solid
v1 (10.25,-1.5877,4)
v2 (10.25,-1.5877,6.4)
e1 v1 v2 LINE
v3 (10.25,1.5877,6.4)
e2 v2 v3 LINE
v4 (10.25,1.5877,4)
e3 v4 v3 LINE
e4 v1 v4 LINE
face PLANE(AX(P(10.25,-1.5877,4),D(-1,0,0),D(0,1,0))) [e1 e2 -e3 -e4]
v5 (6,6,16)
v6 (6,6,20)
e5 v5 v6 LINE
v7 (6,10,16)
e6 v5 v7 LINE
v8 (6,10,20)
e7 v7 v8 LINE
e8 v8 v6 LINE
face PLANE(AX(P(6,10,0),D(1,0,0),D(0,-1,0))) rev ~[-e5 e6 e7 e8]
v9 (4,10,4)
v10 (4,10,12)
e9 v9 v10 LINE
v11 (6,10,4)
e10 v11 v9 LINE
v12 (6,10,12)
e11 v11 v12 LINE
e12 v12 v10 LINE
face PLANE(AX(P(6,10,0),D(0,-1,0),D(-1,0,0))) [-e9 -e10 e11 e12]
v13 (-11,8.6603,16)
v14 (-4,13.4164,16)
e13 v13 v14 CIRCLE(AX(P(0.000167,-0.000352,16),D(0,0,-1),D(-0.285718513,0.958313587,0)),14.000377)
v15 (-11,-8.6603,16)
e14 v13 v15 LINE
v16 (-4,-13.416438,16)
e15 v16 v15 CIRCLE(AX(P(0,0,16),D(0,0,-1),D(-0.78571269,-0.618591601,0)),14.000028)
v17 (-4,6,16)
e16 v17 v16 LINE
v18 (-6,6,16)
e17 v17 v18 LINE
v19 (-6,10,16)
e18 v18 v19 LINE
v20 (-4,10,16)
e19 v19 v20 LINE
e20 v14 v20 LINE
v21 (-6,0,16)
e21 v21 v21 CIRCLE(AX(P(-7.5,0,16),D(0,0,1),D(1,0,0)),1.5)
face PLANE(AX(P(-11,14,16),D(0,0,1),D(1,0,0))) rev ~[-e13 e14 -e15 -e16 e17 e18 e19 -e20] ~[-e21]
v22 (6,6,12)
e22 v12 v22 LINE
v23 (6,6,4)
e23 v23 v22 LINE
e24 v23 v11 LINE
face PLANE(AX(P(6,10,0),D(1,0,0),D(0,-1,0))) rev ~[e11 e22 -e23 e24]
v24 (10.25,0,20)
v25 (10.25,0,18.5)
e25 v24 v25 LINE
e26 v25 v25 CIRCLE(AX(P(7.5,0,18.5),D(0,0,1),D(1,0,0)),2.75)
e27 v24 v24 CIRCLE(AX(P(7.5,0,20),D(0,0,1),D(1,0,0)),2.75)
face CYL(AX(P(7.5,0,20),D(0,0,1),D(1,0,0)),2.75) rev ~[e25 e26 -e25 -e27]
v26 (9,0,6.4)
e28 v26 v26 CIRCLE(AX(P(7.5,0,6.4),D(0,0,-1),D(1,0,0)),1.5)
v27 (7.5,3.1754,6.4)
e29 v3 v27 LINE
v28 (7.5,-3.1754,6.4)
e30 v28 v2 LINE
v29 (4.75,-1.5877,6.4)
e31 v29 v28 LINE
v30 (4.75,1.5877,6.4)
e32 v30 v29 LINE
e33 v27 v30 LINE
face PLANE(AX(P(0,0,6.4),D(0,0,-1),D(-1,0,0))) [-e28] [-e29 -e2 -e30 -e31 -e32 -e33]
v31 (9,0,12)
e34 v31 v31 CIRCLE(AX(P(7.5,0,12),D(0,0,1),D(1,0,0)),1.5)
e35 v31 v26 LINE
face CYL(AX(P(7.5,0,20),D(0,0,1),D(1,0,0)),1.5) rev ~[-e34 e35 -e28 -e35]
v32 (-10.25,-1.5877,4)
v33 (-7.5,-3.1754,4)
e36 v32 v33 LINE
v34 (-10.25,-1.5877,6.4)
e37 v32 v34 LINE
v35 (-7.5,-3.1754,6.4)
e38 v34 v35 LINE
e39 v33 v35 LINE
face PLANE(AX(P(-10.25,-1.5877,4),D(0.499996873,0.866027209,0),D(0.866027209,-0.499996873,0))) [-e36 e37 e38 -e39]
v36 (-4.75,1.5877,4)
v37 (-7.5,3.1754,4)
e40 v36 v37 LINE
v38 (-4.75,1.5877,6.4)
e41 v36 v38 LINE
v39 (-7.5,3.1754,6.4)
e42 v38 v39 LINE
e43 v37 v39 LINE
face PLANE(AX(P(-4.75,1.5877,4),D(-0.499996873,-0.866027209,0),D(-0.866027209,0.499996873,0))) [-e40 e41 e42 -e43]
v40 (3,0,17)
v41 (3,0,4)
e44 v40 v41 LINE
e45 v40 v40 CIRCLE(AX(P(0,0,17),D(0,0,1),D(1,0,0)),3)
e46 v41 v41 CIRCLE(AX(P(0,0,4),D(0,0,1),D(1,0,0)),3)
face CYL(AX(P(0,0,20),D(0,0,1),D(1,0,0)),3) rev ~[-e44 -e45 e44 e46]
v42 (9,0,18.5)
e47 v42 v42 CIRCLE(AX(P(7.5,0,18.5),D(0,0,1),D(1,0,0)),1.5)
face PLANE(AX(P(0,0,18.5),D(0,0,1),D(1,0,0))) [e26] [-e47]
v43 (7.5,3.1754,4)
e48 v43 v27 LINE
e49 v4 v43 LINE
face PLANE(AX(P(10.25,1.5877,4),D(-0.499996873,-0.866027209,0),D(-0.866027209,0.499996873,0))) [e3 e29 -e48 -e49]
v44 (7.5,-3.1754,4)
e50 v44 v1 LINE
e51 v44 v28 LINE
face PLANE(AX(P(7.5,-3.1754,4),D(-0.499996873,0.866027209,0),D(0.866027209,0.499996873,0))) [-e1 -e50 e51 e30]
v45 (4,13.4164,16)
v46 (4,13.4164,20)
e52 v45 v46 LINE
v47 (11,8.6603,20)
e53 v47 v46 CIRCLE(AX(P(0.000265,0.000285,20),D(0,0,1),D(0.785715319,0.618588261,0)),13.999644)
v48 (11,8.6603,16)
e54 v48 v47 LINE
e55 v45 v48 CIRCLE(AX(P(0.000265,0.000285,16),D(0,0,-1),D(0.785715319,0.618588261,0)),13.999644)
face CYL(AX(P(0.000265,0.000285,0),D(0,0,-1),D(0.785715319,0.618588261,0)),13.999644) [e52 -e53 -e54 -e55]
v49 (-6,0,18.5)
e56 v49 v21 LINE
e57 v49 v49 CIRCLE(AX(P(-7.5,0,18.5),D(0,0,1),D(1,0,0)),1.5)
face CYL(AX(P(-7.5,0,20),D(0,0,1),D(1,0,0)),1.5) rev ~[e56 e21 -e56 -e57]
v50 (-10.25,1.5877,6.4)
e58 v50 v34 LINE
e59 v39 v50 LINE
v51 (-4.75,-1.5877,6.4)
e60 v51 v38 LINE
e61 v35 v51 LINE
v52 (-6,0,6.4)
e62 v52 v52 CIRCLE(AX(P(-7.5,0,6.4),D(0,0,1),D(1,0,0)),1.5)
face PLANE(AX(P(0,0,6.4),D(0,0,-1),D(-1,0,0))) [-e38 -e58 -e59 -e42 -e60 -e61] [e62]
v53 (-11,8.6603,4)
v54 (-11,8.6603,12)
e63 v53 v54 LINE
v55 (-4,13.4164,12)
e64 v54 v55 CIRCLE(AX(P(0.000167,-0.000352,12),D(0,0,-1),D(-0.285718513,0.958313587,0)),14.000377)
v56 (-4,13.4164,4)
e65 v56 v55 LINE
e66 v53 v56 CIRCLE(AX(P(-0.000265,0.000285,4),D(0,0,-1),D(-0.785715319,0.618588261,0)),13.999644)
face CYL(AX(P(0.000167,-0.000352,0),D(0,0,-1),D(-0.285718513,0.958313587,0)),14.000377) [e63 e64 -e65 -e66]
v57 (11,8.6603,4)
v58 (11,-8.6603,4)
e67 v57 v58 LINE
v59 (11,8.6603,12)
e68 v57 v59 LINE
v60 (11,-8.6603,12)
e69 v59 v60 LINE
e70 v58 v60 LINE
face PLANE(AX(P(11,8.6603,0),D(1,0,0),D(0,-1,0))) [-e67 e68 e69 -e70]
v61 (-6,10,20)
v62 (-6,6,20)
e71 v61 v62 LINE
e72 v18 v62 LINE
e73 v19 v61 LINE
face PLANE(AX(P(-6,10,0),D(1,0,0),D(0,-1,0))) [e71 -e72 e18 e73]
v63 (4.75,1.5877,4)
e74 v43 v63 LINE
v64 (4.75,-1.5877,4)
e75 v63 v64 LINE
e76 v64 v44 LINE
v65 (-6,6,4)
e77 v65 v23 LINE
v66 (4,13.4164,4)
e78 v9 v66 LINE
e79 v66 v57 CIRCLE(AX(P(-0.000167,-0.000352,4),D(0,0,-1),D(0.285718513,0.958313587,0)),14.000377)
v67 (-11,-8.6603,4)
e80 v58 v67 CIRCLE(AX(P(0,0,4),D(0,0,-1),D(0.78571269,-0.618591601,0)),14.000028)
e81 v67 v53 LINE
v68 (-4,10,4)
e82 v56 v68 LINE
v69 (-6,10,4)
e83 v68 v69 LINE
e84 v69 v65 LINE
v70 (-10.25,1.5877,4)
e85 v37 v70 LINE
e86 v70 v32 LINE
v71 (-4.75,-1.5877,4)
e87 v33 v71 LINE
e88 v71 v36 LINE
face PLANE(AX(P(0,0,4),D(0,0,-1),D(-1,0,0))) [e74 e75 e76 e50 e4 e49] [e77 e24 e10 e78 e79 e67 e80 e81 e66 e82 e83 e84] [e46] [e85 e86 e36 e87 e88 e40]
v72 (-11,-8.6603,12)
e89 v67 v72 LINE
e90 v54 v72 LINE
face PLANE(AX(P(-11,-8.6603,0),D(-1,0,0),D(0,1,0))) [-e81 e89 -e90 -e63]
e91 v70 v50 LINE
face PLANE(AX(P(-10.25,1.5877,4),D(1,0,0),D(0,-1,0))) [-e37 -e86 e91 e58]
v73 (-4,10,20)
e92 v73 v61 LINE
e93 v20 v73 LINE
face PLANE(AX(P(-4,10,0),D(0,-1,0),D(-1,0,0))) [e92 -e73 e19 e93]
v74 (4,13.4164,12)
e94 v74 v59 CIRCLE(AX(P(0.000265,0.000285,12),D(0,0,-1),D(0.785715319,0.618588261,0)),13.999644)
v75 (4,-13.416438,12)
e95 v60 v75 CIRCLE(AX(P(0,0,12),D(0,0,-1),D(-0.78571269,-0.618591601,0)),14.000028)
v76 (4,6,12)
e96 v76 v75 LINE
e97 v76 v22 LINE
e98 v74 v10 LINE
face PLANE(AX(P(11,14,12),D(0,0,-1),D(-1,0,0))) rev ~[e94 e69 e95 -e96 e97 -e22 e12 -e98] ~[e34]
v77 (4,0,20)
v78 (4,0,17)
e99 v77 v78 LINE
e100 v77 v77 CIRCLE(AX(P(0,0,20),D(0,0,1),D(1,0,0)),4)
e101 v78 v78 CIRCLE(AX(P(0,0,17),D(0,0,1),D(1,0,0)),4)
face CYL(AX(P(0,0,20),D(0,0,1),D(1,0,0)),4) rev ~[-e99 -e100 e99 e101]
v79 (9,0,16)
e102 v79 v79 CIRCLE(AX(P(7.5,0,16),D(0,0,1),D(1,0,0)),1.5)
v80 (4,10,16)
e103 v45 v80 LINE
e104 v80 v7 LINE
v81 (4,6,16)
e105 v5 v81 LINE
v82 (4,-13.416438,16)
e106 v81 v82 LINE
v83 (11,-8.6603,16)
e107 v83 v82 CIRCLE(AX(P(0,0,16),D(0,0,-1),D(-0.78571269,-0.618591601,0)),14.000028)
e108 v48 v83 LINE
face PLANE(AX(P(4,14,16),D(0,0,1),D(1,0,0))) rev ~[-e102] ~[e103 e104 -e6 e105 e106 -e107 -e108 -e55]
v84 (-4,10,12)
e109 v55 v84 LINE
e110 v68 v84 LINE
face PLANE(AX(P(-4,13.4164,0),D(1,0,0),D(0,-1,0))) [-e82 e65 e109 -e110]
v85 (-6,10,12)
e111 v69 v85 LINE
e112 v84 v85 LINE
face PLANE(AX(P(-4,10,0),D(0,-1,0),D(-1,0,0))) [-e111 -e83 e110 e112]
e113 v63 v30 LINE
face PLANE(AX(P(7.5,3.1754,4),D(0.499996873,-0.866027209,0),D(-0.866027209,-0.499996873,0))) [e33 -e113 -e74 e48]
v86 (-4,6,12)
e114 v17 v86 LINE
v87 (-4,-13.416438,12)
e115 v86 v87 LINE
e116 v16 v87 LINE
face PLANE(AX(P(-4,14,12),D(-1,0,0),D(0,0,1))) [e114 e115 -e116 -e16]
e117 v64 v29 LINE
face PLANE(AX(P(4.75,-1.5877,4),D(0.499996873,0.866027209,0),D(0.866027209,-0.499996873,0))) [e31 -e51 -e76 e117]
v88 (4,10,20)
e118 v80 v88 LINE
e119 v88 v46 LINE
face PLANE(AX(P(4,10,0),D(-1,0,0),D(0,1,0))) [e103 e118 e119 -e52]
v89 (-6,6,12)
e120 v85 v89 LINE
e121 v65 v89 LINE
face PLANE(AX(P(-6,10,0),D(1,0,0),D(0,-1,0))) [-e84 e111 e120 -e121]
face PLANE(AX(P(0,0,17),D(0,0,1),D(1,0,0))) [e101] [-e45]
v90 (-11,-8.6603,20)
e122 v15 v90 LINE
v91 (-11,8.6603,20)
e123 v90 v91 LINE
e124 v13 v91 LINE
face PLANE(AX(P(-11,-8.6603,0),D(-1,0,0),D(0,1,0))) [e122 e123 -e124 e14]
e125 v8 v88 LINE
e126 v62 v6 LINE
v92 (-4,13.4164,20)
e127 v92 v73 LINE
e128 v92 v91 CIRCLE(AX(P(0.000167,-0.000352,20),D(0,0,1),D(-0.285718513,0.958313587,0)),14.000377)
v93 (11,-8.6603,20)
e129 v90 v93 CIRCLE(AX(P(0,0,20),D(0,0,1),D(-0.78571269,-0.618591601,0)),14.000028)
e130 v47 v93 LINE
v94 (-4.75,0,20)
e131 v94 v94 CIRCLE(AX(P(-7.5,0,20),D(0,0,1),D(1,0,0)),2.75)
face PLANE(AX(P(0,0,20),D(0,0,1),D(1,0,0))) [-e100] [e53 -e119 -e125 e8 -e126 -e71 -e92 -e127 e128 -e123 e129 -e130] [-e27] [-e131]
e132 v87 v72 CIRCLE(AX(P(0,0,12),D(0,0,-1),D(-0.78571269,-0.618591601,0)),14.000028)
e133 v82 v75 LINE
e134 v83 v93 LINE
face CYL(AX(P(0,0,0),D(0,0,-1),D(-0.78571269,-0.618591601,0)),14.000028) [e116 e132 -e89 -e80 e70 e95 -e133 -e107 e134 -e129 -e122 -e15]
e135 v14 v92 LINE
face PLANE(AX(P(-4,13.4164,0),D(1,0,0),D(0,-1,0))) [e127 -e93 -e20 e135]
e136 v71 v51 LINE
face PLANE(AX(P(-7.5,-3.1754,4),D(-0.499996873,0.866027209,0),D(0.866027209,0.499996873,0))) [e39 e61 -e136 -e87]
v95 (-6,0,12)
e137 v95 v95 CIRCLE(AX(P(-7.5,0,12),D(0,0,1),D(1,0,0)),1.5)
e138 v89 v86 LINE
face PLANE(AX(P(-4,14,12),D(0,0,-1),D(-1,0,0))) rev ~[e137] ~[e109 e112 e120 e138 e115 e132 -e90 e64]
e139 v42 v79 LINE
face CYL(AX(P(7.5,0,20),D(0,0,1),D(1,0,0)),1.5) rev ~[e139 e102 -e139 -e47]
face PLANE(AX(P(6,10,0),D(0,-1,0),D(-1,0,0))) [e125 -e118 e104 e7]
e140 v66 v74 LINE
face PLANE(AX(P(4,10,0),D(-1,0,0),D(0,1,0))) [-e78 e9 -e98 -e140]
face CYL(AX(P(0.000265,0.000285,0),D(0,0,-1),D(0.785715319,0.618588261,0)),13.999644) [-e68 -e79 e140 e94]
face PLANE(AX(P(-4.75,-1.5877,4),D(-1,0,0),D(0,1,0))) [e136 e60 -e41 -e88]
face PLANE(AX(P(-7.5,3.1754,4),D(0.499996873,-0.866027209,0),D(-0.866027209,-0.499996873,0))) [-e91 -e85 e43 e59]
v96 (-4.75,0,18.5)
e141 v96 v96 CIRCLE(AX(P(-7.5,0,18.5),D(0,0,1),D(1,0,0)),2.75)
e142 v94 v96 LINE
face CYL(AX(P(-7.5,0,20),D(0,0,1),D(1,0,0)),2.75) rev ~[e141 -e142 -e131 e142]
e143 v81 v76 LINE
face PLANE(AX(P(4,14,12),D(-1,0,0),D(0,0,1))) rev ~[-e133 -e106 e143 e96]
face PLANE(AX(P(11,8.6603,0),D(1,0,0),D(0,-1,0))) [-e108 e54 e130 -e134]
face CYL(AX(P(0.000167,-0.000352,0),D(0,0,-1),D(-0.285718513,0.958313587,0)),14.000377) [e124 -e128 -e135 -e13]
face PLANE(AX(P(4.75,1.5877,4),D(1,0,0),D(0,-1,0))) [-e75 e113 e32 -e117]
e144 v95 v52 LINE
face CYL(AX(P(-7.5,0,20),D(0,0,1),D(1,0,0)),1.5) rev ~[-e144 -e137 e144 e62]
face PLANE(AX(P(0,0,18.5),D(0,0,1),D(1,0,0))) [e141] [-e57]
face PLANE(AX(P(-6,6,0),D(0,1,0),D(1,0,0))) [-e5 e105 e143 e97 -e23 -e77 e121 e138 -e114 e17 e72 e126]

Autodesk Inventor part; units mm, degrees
ref_plane "YZ Plane" through (0, 0, 0) normal (1, 0, 0) x (0, 1, 0)
ref_plane "XZ Plane" through (0, 0, 0) normal (0, 1, 0) x (-1, 0, 0)
sketch "Náčrt1" plane through (0, 0, 0) normal (0, 0, 1) x (1, 0, 0)
  line L0 (11, 8.6603) -> (11, -8.6603)
  line L1 (-11, -8.6603) -> (-11, 8.6603)
  arc A0 (-11, -8.6603) -> (11, -8.6603) centre (0, 0) ccw
  line L2 (-4, 13.4164) -> (-4, 10)
  line L3 (-4, 10) -> (-6, 10)
  line L4 (-6, 6) -> (6, 6)
  line L5 (6, 10) -> (4, 10)
  line L6 (4, 10) -> (4, 13.4164)
  line L7 (-6, 10) -> (-6, 6)
  line L8 (6, 10) -> (6, 6)
  arc A1 (11, 8.6603) -> (4, 13.4164) centre (0, 0) ccw
  arc A2 (-4, 13.4164) -> (-11, 8.6603) centre (0, 0) ccw
  dimension "d26" = 22
  dimension "attachmentRadius" = 14
  dimension "d28" = 14
  dimension "d29" = 14
extrude "Vysunutí1" add sketch "Náčrt1" along normal blind 20
ref_plane "Pracovní rovina1" through (0, 14, 0) normal (0, 1, 0) x (-1, 0, 0)
sketch "Náčrt2" plane through (0, 14, 0) normal (0, 1, 0) x (-1, 0, 0)
  line L0 (11, 0) -> (11, 20) projected
  line L1 (4, 0) -> (4, 20) projected
  line L2 (11, 16) -> (4, 16)
  line L3 (4, 16) -> (4, 12)
  line L4 (4, 12) -> (11, 12)
  line L5 (11, 12) -> (11, 16)
  line L6 (-4, 0) -> (-4, 20) projected
  line L7 (-11, 0) -> (-11, 20) projected
  line L8 (-4, 16) -> (-11, 16)
  line L9 (-11, 16) -> (-11, 12)
  line L10 (-11, 12) -> (-4, 12)
  line L11 (-4, 12) -> (-4, 16)
  point P0 (0, 0)
extrude "Vysunutí2" cut sketch "Náčrt2" against normal up to next
sketch "Náčrt6" plane through (0, 0, 20) normal (0, 0, 1) x (1, 0, 0)
  circle A0 centre (7.5, 0) radius 1.5
  circle A1 centre (-7.5, 0) radius 1.5
  line L0 (11, -8.6603) -> (11, 8.6603) projected
  line L1 (-11, 8.6603) -> (-11, -8.6603) projected
  arc A2 (11, 8.6603) -> (4, 13.4164) centre (0, 0) ccw projected
  dimension "d15" = 3.5
  dimension "attachmentHoleOffset" = 3.5
  dimension "d17" = 3
  dimension "attachmentHoleDia" = 3
extrude "Vysunutí6" cut sketch "Náčrt6" against normal up to surface (20 mm away)
sketch "Náčrt8" plane through (0, 0, 0) normal (0, 0, -1) x (-1, 0, 0)
  circle A0 centre (-7.5, 0) radius 1.5 projected
  circle A1 centre (7.5, 0) radius 1.5 projected
  line L0 (-11, 8.6603) -> (-11, -8.6603) projected
  arc A2 (-11, -8.6603) -> (11, -8.6603) centre (0, 0) ccw projected
  line L1 (11, -8.6603) -> (11, 8.6603) projected
  arc A3 (11, 8.6603) -> (4, 13.4164) centre (0, 0) ccw projected
  line L2 (4, 13.4164) -> (4, 10) projected
  line L3 (4, 10) -> (6, 10) projected
  line L4 (6, 10) -> (6, 6) projected
  line L5 (6, 6) -> (-6, 6) projected
  line L6 (-6, 6) -> (-6, 10) projected
  line L7 (-6, 10) -> (-4, 10) projected
  line L8 (-4, 10) -> (-4, 13.4164) projected
  arc A4 (-4, 13.4164) -> (-11, 8.6603) centre (0, 0) ccw projected
extrude "Vysunutí8" cut sketch "Náčrt8" against normal blind 4
sketch "Náčrt9" plane through (0, 0, 20) normal (0, 0, 1) x (1, 0, 0)
  arc A0 (-4, 13.4164) -> (-11, 8.6603) centre (0, 0) ccw projected
  circle A1 centre (0, 0) radius 3
extrude "Vysunutí9" cut sketch "Náčrt9" against normal up to next
sketch "Náčrt10" plane through (0, 0, 20) normal (0, 0, 1) x (1, 0, 0)
  circle A0 centre (0, 0) radius 3 projected
  arc A1 (-11, -8.6603) -> (11, -8.6603) centre (0, 0) ccw projected
  circle A2 centre (0, 0) radius 4
  dimension "d23" = 8
extrude "Vysunutí10" cut sketch "Náčrt10" against normal blind 3
sketch "Náčrt11" plane through (0, 0, 20) normal (0, 0, 1) x (1, 0, 0)
  circle A0 centre (7.5, 0) radius 1.5 projected
  circle A1 centre (-7.5, 0) radius 1.5 projected
  circle A2 centre (-7.5, 0) radius 1.5 projected
  circle A3 centre (-7.5, 0) radius 2.75
  circle A4 centre (7.5, 0) radius 1.5 projected
  circle A5 centre (7.5, 0) radius 2.75
  dimension "d30" = 5.5
  dimension "d31" = 5.5
extrude "Vysunutí11" cut sketch "Náčrt11" against normal blind 1.5
sketch "Náčrt12" plane through (0, 0, 4) normal (0, 0, -1) x (-1, 0, 0)
  line L0 (7.5, 3.1754) -> (10.25, 1.5877)
  line L1 (10.25, 1.5877) -> (10.25, -1.5877)
  line L2 (10.25, -1.5877) -> (7.5, -3.1754)
  line L3 (7.5, -3.1754) -> (4.75, -1.5877)
  line L4 (4.75, -1.5877) -> (4.75, 1.5877)
  line L5 (4.75, 1.5877) -> (7.5, 3.1754)
  line L6 (-11, -8.6603) -> (-11, 8.6603)
  circle A0 centre (-7.5, 0) radius 1.5 projected
  line L7 (-7.5, 3.1754) -> (-4.75, 1.5877)
  line L8 (-4.75, 1.5877) -> (-4.75, -1.5877)
  line L9 (-4.75, -1.5877) -> (-7.5, -3.1754)
  line L10 (-7.5, -3.1754) -> (-10.25, -1.5877)
  line L11 (-10.25, -1.5877) -> (-10.25, 1.5877)
  line L12 (-10.25, 1.5877) -> (-7.5, 3.1754)
  point P0 (7.5, 0)
  point P1 (7.5, 0)
  dimension "d38" = 5.5
extrude "Vysunutí13" cut sketch "Náčrt12" against normal blind 2.4
equation "\"d28\" = attachmentRadius"
equation "\"d29\" = attachmentRadius"
equation "\"d15\" = attachmentHoleOffset"
equation "\"d17\" = attachmentHoleDia"
properties part number "attachment"
